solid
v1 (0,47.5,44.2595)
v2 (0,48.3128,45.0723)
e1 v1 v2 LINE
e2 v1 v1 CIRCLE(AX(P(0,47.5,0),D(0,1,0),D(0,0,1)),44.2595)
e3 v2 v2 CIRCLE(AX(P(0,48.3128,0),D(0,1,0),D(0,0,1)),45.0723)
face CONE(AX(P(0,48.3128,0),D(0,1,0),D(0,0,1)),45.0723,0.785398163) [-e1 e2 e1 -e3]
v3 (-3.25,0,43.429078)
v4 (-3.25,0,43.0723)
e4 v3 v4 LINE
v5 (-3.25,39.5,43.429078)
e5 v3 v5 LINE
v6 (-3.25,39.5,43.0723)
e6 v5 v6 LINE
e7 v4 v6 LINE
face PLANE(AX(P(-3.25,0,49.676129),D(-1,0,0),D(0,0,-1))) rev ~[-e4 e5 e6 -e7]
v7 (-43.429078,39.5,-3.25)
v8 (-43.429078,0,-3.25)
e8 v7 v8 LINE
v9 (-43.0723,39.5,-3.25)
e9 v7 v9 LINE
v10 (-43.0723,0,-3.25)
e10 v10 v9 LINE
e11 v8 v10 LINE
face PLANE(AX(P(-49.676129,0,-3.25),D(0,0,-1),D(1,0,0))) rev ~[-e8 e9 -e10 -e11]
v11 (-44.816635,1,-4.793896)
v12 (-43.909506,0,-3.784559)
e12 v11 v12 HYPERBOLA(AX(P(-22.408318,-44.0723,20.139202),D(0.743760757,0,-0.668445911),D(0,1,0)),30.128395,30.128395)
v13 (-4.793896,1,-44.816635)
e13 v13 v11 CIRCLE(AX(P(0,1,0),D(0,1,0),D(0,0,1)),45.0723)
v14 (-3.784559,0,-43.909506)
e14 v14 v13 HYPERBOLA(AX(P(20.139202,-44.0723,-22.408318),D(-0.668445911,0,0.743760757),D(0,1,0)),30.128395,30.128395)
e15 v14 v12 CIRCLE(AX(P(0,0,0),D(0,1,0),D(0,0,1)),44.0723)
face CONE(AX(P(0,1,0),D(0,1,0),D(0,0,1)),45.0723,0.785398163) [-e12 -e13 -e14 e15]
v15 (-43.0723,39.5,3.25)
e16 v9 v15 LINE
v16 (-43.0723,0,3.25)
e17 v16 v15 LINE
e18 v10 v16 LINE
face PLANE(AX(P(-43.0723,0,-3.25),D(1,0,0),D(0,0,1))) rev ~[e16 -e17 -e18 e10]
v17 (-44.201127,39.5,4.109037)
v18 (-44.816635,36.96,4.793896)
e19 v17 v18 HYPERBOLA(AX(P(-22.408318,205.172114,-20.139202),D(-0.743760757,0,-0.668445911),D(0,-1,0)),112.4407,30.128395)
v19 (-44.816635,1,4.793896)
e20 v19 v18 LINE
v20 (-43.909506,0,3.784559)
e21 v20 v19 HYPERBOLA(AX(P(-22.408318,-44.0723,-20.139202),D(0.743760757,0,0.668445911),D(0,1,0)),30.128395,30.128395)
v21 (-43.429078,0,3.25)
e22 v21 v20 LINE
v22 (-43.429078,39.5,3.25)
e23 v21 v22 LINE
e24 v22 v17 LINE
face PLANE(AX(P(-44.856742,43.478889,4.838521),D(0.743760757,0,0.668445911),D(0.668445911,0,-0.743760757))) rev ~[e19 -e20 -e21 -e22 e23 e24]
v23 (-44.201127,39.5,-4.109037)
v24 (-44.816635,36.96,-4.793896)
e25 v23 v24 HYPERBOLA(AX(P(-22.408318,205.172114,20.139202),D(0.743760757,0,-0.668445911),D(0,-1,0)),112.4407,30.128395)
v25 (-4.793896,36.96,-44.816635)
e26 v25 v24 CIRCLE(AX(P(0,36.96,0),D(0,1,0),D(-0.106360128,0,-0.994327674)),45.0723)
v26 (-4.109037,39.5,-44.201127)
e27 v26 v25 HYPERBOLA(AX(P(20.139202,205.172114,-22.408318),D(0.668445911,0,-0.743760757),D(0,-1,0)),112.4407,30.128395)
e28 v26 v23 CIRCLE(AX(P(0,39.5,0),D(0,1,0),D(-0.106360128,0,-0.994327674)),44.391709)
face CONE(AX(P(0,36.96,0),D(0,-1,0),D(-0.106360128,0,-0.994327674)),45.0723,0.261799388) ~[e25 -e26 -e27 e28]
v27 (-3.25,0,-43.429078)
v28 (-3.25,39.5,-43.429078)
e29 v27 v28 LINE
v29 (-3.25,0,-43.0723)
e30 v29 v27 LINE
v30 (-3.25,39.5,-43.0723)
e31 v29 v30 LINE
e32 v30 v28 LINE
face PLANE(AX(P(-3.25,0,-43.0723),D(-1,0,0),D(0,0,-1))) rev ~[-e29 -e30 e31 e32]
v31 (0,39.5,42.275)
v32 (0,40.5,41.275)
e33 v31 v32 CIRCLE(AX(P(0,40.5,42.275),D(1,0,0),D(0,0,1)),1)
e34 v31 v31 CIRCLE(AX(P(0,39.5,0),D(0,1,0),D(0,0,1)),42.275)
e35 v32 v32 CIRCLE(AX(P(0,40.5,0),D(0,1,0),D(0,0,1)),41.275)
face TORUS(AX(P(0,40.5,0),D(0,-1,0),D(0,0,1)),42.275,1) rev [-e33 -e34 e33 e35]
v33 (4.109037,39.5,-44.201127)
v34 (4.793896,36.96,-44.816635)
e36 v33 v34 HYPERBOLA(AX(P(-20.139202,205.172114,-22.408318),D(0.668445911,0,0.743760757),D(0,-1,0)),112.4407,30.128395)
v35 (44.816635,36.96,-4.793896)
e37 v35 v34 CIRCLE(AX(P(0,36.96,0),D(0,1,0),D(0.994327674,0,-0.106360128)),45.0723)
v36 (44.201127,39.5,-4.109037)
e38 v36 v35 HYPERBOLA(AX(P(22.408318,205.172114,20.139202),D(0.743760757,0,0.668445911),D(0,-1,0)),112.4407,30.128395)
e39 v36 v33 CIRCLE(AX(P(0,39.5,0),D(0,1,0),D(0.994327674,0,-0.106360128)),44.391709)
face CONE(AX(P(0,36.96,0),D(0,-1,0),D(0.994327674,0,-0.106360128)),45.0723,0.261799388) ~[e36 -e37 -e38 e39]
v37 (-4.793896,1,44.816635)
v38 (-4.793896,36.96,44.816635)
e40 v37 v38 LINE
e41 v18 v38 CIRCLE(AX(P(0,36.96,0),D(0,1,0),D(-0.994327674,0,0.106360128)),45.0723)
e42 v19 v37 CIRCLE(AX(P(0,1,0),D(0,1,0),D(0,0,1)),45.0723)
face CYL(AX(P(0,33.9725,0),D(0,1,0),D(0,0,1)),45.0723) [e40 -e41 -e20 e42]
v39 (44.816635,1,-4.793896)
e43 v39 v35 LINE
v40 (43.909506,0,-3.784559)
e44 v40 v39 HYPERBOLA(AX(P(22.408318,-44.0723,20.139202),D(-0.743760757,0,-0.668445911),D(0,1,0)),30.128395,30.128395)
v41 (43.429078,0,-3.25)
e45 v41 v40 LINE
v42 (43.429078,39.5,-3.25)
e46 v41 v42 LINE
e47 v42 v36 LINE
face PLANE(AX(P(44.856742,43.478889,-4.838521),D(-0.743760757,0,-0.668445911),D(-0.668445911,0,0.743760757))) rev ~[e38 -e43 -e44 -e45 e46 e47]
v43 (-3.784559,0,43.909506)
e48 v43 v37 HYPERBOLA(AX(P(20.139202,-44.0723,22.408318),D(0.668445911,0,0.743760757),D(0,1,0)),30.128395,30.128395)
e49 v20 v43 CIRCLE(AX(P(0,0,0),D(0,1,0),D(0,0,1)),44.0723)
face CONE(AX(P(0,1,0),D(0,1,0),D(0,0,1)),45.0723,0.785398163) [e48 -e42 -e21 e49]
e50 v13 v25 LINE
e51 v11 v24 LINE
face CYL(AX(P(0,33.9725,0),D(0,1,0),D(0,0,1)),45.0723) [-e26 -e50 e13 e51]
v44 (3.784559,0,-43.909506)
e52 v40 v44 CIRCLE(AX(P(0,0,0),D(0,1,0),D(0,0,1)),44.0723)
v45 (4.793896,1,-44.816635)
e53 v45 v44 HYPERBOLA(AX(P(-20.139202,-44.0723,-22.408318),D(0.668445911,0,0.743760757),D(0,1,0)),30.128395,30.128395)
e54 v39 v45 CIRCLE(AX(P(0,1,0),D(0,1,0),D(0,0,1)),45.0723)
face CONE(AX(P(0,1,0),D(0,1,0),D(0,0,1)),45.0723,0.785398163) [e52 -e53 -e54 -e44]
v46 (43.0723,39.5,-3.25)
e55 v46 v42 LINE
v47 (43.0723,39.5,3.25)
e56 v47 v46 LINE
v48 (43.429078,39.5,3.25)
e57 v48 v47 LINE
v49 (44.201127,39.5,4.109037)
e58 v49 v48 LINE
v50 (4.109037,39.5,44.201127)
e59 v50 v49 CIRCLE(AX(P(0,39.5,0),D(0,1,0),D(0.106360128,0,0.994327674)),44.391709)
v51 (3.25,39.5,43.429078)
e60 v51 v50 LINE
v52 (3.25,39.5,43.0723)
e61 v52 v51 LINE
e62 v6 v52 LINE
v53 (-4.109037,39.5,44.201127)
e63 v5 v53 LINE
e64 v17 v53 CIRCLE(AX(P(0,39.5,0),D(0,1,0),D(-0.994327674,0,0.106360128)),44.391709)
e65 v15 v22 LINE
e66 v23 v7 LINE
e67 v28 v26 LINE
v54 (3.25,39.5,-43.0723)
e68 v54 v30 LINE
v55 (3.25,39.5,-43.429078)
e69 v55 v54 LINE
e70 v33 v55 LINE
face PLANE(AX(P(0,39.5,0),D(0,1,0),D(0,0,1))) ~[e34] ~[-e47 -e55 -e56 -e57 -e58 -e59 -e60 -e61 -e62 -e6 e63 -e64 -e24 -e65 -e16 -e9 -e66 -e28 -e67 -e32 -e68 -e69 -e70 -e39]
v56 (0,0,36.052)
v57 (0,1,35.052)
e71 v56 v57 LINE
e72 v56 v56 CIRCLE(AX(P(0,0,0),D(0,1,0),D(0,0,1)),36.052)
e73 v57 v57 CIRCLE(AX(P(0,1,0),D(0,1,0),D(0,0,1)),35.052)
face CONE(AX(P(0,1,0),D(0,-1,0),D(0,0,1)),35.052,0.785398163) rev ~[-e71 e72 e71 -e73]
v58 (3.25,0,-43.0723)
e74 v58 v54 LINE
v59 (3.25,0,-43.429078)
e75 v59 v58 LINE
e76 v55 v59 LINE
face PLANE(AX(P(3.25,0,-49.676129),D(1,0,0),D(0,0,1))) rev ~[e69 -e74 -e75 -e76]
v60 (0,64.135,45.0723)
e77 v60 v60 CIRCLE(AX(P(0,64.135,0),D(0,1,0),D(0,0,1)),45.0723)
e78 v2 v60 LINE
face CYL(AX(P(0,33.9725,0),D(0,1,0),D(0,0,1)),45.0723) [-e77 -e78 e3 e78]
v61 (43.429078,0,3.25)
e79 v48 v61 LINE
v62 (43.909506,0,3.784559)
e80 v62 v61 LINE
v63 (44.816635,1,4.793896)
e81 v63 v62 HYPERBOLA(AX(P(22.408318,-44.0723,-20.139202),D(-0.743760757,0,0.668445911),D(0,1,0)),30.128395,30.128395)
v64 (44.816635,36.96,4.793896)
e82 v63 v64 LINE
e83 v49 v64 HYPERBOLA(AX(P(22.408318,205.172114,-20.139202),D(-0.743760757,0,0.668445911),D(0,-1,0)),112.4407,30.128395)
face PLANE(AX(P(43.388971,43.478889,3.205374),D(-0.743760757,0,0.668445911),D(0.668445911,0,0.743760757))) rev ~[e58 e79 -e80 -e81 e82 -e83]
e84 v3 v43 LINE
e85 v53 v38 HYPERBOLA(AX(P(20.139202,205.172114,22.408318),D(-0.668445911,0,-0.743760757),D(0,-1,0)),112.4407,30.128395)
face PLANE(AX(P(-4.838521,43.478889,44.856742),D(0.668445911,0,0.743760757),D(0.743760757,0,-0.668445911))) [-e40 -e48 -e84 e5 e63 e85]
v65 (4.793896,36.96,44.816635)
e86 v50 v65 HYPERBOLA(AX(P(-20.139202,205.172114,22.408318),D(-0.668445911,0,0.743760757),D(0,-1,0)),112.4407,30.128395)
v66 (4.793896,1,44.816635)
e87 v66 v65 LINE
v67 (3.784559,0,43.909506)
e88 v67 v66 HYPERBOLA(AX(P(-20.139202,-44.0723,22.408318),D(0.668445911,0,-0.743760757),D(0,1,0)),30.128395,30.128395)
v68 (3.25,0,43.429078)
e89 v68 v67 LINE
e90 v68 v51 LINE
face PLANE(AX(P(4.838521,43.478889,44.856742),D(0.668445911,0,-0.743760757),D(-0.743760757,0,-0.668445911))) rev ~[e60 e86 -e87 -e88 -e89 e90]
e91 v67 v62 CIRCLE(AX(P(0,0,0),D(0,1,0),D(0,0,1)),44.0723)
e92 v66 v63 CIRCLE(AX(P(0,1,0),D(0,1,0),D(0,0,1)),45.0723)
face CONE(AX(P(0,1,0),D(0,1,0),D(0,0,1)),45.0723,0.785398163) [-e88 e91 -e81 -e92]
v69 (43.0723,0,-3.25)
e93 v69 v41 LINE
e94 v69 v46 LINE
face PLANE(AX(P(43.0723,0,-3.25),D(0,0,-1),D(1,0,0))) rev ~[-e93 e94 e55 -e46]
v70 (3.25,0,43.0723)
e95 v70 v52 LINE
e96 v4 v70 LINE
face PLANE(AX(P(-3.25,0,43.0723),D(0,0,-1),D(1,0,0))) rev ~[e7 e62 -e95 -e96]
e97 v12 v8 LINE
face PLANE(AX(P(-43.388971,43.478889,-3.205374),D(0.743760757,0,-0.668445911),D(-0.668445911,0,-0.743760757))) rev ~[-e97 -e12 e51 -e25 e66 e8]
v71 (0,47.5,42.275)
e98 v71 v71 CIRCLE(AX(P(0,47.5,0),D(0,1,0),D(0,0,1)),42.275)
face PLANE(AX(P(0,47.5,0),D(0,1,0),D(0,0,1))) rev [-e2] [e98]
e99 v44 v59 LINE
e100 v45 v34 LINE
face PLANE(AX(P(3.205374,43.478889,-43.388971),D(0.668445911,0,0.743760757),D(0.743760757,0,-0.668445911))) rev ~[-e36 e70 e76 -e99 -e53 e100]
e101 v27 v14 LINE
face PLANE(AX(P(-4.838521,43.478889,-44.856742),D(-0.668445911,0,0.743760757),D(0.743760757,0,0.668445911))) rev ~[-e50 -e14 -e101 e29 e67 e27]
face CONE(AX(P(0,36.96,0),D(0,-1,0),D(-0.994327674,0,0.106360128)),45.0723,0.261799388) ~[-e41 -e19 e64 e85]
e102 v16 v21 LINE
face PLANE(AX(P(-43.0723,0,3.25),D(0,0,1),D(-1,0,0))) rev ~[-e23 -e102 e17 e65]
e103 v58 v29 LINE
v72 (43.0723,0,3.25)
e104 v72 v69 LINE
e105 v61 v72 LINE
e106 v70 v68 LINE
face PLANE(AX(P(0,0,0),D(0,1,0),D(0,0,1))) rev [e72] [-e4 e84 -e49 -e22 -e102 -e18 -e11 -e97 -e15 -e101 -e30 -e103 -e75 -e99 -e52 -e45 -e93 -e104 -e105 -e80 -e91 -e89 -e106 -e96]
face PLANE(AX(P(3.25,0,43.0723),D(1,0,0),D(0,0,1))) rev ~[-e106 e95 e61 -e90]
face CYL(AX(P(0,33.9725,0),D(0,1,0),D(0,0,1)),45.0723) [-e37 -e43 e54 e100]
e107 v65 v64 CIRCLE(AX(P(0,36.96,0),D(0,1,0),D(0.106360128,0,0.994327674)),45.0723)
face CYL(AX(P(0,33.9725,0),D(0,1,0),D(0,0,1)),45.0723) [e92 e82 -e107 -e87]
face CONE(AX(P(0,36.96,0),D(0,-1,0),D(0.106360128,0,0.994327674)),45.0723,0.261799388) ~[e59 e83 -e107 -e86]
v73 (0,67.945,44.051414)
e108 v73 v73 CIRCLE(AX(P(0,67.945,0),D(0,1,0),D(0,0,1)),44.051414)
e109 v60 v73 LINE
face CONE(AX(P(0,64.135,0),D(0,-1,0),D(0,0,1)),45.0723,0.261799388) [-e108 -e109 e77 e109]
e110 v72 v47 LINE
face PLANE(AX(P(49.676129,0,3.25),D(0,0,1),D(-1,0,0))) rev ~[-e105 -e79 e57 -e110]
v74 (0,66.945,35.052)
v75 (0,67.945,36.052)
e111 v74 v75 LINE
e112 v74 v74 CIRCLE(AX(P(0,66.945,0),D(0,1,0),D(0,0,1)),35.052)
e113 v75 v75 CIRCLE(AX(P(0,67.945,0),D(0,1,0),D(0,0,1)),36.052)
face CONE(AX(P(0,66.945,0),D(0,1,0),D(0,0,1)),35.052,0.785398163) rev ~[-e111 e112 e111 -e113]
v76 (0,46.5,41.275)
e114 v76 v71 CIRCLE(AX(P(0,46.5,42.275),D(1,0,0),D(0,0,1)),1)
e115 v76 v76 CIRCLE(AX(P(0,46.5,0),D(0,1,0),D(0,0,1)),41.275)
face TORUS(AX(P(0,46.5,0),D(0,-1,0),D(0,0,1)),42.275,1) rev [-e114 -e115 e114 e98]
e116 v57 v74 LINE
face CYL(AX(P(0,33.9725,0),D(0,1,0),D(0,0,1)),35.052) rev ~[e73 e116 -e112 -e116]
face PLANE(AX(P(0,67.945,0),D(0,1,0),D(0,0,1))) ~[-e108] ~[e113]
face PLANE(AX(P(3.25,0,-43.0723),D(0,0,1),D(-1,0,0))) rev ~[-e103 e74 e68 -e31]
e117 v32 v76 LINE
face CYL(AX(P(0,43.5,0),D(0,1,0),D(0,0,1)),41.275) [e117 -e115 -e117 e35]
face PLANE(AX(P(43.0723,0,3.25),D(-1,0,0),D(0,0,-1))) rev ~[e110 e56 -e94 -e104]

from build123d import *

# Parameters (mm, degrees)
F0_W            = 67.945
F0_H            = 10.0203
F2_SIZE         = 1
F3_SIZE2        = 1.0208864232
F3_SIZE         = 3.81
F4_W            = 8
F4_H            = 9.8567151233
F7_DEPTH        = 40
F7_COPIES_COUNT = 4
F8_T1_DEPTH     = 46.4577782779
F9_R            = 1
F10_SIZE        = 0.8128
F11_SIZE2       = 2.54
F11_SIZE        = 0.6805909488


# Not quite as in the source:
# - a fillet or chamfer that OpenCascade refuses, or shapes differently, is made with other operations: its cross-section is extruded or revolved along the edge and cut away or added
# - a pattern or mirror of a feature is missing from the dataset's text; its kind, count and spacing are read off the source's solid


with BuildPart() as f1:
    # F0 (on Right) → F1 (revolve)
    with BuildSketch(Plane.YZ):
        with Locations((33.9725, 40.06215)):
            Rectangle(F0_W, F0_H)
    revolve(axis=Axis((0, 10.0695292601, 0), (0, 1, 0)))

    # F2
    f2_edges = [f1.edges().sort_by_distance(p)[0] for p in [
        (0, 0, -35.052),
        (0, 0, -45.0723),
        (0, 67.945, -35.052),
    ]]
    chamfer(f2_edges, length=F2_SIZE)

    # F3
    f3_edges = [f1.edges().sort_by_distance(p)[0] for p in [
        (0, 67.945, -45.0723),
    ]]
    chamfer(f3_edges, length=F3_SIZE, length2=F3_SIZE2)

    # F4 (on Right) → F5 (revolve, cut)
    with BuildSketch(Plane.YZ):
        with Locations((43.5, 46.2033575617)):
            Rectangle(F4_W, F4_H)
    revolve(axis=Axis((0, 33.4974332383, 0), (0, 1, 0)), mode=Mode.SUBTRACT)

    # F6 (on face) → F7 (cut)
    with BuildSketch(Plane.XZ):
        Polygon((3.25, 49.6761292126), (0, 49.6761292126), (-3.25, 49.6761292126), (-3.25, 43.0723), (0, 43.0723), (3.25, 43.0723), align=None)
    f7 = extrude(amount=-F7_DEPTH, mode=Mode.SUBTRACT)

    # F7_copies: F7 ×4 about axis
    f7_copies_axis = Axis((0, 0, 0), (0, 1, 0))
    for i in range(1, F7_COPIES_COUNT):
        add(f7.rotate(f7_copies_axis, i * 360 / F7_COPIES_COUNT), mode=Mode.SUBTRACT)

    # F8: chamfer of 1.5 on 8 edges, made by hand

    # F8_s2 → F8_t1 (cut)
    with BuildSketch(Plane.XZ.offset(-43.478889139)):
        with BuildLine():
            Line((-4.8385212577, 44.8567419714), (-3.2053743546, 43.3889711075))
            Line((-3.2053743546, 43.3889711075), (-3.1753743546, 43.3889711075))
            ThreePointArc((-3.1753743546, 43.3889711075), (-3.22, 44.1719727759), (-3.22, 44.9549744443))
            Line((-3.22, 44.9549744443), (-3.2521631911, 44.9848963528))
            ThreePointArc((-3.2521631911, 44.9848963528), (-4.0455787179, 44.9204937431), (-4.8417120615, 44.8865718016))
            Line((-4.8417120615, 44.8865718016), (-4.8385212577, 44.8567419714))
        make_face()
        with BuildLine():
            Line((4.8385212577, 44.8567419714), (3.2053743546, 43.3889711075))
            Line((3.2053743546, 43.3889711075), (3.1753743546, 43.3889711075))
            ThreePointArc((3.1753743546, 43.3889711075), (3.22, 44.1719727759), (3.22, 44.9549744443))
            Line((3.22, 44.9549744443), (3.2521631911, 44.9848963528))
            ThreePointArc((3.2521631911, 44.9848963528), (4.0455787179, 44.9204937431), (4.8417120615, 44.8865718016))
            Line((4.8417120615, 44.8865718016), (4.8385212577, 44.8567419714))
        make_face()
        with BuildLine():
            Line((-44.8567419714, 4.8385212577), (-43.3889711075, 3.2053743546))
            Line((-43.3889711075, 3.2053743546), (-43.3889711075, 3.1753743546))
            ThreePointArc((-43.3889711075, 3.1753743546), (-44.1719727759, 3.22), (-44.9549744443, 3.22))
            Line((-44.9549744443, 3.22), (-44.9848963528, 3.2521631911))
            ThreePointArc((-44.9848963528, 3.2521631911), (-44.9204937431, 4.0455787179), (-44.8865718016, 4.8417120615))
            Line((-44.8865718016, 4.8417120615), (-44.8567419714, 4.8385212577))
        make_face()
        with BuildLine():
            Line((-43.3889711075, -3.2053743546), (-44.8567419714, -4.8385212577))
            Line((-44.8567419714, -4.8385212577), (-44.8865718016, -4.8417120615))
            ThreePointArc((-44.8865718016, -4.8417120615), (-44.9204937431, -4.0455787179), (-44.9848963528, -3.2521631911))
            Line((-44.9848963528, -3.2521631911), (-44.9549744443, -3.22))
            ThreePointArc((-44.9549744443, -3.22), (-44.1719727759, -3.22), (-43.3889711075, -3.1753743546))
            Line((-43.3889711075, -3.1753743546), (-43.3889711075, -3.2053743546))
        make_face()
        with BuildLine():
            Line((-4.8385212577, -44.8567419714), (-3.2053743546, -43.3889711075))
            Line((-3.2053743546, -43.3889711075), (-3.1753743546, -43.3889711075))
            ThreePointArc((-3.1753743546, -43.3889711075), (-3.22, -44.1719727759), (-3.22, -44.9549744443))
            Line((-3.22, -44.9549744443), (-3.2521631911, -44.9848963528))
            ThreePointArc((-3.2521631911, -44.9848963528), (-4.0455787179, -44.9204937431), (-4.8417120615, -44.8865718016))
            Line((-4.8417120615, -44.8865718016), (-4.8385212577, -44.8567419714))
        make_face()
        with BuildLine():
            Line((3.2053743546, -43.3889711075), (4.8385212577, -44.8567419714))
            Line((4.8385212577, -44.8567419714), (4.8417120615, -44.8865718016))
            ThreePointArc((4.8417120615, -44.8865718016), (4.0455787179, -44.9204937431), (3.2521631911, -44.9848963528))
            Line((3.2521631911, -44.9848963528), (3.22, -44.9549744443))
            ThreePointArc((3.22, -44.9549744443), (3.22, -44.1719727759), (3.1753743546, -43.3889711075))
            Line((3.1753743546, -43.3889711075), (3.2053743546, -43.3889711075))
        make_face()
        with BuildLine():
            Line((44.8567419714, -4.8385212577), (43.3889711075, -3.2053743546))
            Line((43.3889711075, -3.2053743546), (43.3889711075, -3.1753743546))
            ThreePointArc((43.3889711075, -3.1753743546), (44.1719727759, -3.22), (44.9549744443, -3.22))
            Line((44.9549744443, -3.22), (44.9848963528, -3.2521631911))
            ThreePointArc((44.9848963528, -3.2521631911), (44.9204937431, -4.0455787179), (44.8865718016, -4.8417120615))
            Line((44.8865718016, -4.8417120615), (44.8567419714, -4.8385212577))
        make_face()
        with BuildLine():
            Line((43.3889711075, 3.2053743546), (44.8567419714, 4.8385212577))
            Line((44.8567419714, 4.8385212577), (44.8865718016, 4.8417120615))
            ThreePointArc((44.8865718016, 4.8417120615), (44.9204937431, 4.0455787179), (44.9848963528, 3.2521631911))
            Line((44.9848963528, 3.2521631911), (44.9549744443, 3.22))
            ThreePointArc((44.9549744443, 3.22), (44.1719727759, 3.22), (43.3889711075, 3.1753743546))
            Line((43.3889711075, 3.1753743546), (43.3889711075, 3.2053743546))
        make_face()
    extrude(amount=F8_T1_DEPTH, mode=Mode.SUBTRACT)

    # F9
    f9_edges = [f1.edges().sort_by_distance(p)[0] for p in [
        (0, 39.5, -41.275),
        (0, 47.5, -41.275),
    ]]
    fillet(f9_edges, radius=F9_R)

    # F10
    f10_edges = [f1.edges().sort_by_distance(p)[0] for p in [
        (0, 47.5, -45.0723),
    ]]
    chamfer(f10_edges, length=F10_SIZE)

    # F11
    f11_edges = [f1.edges().sort_by_distance(p)[0] for p in [
        (-31.870929, 39.5, 31.870929),
        (-31.870929, 39.5, -31.870929),
        (31.870929, 39.5, -31.870929),
        (31.870929, 39.5, 31.870929),
    ]]
    f11_side = f1.faces().sort_by_distance((0, 39.5, -42.401761))[0]
    chamfer(f11_edges, length=F11_SIZE, length2=F11_SIZE2, reference=f11_side)


solid = f1.part
